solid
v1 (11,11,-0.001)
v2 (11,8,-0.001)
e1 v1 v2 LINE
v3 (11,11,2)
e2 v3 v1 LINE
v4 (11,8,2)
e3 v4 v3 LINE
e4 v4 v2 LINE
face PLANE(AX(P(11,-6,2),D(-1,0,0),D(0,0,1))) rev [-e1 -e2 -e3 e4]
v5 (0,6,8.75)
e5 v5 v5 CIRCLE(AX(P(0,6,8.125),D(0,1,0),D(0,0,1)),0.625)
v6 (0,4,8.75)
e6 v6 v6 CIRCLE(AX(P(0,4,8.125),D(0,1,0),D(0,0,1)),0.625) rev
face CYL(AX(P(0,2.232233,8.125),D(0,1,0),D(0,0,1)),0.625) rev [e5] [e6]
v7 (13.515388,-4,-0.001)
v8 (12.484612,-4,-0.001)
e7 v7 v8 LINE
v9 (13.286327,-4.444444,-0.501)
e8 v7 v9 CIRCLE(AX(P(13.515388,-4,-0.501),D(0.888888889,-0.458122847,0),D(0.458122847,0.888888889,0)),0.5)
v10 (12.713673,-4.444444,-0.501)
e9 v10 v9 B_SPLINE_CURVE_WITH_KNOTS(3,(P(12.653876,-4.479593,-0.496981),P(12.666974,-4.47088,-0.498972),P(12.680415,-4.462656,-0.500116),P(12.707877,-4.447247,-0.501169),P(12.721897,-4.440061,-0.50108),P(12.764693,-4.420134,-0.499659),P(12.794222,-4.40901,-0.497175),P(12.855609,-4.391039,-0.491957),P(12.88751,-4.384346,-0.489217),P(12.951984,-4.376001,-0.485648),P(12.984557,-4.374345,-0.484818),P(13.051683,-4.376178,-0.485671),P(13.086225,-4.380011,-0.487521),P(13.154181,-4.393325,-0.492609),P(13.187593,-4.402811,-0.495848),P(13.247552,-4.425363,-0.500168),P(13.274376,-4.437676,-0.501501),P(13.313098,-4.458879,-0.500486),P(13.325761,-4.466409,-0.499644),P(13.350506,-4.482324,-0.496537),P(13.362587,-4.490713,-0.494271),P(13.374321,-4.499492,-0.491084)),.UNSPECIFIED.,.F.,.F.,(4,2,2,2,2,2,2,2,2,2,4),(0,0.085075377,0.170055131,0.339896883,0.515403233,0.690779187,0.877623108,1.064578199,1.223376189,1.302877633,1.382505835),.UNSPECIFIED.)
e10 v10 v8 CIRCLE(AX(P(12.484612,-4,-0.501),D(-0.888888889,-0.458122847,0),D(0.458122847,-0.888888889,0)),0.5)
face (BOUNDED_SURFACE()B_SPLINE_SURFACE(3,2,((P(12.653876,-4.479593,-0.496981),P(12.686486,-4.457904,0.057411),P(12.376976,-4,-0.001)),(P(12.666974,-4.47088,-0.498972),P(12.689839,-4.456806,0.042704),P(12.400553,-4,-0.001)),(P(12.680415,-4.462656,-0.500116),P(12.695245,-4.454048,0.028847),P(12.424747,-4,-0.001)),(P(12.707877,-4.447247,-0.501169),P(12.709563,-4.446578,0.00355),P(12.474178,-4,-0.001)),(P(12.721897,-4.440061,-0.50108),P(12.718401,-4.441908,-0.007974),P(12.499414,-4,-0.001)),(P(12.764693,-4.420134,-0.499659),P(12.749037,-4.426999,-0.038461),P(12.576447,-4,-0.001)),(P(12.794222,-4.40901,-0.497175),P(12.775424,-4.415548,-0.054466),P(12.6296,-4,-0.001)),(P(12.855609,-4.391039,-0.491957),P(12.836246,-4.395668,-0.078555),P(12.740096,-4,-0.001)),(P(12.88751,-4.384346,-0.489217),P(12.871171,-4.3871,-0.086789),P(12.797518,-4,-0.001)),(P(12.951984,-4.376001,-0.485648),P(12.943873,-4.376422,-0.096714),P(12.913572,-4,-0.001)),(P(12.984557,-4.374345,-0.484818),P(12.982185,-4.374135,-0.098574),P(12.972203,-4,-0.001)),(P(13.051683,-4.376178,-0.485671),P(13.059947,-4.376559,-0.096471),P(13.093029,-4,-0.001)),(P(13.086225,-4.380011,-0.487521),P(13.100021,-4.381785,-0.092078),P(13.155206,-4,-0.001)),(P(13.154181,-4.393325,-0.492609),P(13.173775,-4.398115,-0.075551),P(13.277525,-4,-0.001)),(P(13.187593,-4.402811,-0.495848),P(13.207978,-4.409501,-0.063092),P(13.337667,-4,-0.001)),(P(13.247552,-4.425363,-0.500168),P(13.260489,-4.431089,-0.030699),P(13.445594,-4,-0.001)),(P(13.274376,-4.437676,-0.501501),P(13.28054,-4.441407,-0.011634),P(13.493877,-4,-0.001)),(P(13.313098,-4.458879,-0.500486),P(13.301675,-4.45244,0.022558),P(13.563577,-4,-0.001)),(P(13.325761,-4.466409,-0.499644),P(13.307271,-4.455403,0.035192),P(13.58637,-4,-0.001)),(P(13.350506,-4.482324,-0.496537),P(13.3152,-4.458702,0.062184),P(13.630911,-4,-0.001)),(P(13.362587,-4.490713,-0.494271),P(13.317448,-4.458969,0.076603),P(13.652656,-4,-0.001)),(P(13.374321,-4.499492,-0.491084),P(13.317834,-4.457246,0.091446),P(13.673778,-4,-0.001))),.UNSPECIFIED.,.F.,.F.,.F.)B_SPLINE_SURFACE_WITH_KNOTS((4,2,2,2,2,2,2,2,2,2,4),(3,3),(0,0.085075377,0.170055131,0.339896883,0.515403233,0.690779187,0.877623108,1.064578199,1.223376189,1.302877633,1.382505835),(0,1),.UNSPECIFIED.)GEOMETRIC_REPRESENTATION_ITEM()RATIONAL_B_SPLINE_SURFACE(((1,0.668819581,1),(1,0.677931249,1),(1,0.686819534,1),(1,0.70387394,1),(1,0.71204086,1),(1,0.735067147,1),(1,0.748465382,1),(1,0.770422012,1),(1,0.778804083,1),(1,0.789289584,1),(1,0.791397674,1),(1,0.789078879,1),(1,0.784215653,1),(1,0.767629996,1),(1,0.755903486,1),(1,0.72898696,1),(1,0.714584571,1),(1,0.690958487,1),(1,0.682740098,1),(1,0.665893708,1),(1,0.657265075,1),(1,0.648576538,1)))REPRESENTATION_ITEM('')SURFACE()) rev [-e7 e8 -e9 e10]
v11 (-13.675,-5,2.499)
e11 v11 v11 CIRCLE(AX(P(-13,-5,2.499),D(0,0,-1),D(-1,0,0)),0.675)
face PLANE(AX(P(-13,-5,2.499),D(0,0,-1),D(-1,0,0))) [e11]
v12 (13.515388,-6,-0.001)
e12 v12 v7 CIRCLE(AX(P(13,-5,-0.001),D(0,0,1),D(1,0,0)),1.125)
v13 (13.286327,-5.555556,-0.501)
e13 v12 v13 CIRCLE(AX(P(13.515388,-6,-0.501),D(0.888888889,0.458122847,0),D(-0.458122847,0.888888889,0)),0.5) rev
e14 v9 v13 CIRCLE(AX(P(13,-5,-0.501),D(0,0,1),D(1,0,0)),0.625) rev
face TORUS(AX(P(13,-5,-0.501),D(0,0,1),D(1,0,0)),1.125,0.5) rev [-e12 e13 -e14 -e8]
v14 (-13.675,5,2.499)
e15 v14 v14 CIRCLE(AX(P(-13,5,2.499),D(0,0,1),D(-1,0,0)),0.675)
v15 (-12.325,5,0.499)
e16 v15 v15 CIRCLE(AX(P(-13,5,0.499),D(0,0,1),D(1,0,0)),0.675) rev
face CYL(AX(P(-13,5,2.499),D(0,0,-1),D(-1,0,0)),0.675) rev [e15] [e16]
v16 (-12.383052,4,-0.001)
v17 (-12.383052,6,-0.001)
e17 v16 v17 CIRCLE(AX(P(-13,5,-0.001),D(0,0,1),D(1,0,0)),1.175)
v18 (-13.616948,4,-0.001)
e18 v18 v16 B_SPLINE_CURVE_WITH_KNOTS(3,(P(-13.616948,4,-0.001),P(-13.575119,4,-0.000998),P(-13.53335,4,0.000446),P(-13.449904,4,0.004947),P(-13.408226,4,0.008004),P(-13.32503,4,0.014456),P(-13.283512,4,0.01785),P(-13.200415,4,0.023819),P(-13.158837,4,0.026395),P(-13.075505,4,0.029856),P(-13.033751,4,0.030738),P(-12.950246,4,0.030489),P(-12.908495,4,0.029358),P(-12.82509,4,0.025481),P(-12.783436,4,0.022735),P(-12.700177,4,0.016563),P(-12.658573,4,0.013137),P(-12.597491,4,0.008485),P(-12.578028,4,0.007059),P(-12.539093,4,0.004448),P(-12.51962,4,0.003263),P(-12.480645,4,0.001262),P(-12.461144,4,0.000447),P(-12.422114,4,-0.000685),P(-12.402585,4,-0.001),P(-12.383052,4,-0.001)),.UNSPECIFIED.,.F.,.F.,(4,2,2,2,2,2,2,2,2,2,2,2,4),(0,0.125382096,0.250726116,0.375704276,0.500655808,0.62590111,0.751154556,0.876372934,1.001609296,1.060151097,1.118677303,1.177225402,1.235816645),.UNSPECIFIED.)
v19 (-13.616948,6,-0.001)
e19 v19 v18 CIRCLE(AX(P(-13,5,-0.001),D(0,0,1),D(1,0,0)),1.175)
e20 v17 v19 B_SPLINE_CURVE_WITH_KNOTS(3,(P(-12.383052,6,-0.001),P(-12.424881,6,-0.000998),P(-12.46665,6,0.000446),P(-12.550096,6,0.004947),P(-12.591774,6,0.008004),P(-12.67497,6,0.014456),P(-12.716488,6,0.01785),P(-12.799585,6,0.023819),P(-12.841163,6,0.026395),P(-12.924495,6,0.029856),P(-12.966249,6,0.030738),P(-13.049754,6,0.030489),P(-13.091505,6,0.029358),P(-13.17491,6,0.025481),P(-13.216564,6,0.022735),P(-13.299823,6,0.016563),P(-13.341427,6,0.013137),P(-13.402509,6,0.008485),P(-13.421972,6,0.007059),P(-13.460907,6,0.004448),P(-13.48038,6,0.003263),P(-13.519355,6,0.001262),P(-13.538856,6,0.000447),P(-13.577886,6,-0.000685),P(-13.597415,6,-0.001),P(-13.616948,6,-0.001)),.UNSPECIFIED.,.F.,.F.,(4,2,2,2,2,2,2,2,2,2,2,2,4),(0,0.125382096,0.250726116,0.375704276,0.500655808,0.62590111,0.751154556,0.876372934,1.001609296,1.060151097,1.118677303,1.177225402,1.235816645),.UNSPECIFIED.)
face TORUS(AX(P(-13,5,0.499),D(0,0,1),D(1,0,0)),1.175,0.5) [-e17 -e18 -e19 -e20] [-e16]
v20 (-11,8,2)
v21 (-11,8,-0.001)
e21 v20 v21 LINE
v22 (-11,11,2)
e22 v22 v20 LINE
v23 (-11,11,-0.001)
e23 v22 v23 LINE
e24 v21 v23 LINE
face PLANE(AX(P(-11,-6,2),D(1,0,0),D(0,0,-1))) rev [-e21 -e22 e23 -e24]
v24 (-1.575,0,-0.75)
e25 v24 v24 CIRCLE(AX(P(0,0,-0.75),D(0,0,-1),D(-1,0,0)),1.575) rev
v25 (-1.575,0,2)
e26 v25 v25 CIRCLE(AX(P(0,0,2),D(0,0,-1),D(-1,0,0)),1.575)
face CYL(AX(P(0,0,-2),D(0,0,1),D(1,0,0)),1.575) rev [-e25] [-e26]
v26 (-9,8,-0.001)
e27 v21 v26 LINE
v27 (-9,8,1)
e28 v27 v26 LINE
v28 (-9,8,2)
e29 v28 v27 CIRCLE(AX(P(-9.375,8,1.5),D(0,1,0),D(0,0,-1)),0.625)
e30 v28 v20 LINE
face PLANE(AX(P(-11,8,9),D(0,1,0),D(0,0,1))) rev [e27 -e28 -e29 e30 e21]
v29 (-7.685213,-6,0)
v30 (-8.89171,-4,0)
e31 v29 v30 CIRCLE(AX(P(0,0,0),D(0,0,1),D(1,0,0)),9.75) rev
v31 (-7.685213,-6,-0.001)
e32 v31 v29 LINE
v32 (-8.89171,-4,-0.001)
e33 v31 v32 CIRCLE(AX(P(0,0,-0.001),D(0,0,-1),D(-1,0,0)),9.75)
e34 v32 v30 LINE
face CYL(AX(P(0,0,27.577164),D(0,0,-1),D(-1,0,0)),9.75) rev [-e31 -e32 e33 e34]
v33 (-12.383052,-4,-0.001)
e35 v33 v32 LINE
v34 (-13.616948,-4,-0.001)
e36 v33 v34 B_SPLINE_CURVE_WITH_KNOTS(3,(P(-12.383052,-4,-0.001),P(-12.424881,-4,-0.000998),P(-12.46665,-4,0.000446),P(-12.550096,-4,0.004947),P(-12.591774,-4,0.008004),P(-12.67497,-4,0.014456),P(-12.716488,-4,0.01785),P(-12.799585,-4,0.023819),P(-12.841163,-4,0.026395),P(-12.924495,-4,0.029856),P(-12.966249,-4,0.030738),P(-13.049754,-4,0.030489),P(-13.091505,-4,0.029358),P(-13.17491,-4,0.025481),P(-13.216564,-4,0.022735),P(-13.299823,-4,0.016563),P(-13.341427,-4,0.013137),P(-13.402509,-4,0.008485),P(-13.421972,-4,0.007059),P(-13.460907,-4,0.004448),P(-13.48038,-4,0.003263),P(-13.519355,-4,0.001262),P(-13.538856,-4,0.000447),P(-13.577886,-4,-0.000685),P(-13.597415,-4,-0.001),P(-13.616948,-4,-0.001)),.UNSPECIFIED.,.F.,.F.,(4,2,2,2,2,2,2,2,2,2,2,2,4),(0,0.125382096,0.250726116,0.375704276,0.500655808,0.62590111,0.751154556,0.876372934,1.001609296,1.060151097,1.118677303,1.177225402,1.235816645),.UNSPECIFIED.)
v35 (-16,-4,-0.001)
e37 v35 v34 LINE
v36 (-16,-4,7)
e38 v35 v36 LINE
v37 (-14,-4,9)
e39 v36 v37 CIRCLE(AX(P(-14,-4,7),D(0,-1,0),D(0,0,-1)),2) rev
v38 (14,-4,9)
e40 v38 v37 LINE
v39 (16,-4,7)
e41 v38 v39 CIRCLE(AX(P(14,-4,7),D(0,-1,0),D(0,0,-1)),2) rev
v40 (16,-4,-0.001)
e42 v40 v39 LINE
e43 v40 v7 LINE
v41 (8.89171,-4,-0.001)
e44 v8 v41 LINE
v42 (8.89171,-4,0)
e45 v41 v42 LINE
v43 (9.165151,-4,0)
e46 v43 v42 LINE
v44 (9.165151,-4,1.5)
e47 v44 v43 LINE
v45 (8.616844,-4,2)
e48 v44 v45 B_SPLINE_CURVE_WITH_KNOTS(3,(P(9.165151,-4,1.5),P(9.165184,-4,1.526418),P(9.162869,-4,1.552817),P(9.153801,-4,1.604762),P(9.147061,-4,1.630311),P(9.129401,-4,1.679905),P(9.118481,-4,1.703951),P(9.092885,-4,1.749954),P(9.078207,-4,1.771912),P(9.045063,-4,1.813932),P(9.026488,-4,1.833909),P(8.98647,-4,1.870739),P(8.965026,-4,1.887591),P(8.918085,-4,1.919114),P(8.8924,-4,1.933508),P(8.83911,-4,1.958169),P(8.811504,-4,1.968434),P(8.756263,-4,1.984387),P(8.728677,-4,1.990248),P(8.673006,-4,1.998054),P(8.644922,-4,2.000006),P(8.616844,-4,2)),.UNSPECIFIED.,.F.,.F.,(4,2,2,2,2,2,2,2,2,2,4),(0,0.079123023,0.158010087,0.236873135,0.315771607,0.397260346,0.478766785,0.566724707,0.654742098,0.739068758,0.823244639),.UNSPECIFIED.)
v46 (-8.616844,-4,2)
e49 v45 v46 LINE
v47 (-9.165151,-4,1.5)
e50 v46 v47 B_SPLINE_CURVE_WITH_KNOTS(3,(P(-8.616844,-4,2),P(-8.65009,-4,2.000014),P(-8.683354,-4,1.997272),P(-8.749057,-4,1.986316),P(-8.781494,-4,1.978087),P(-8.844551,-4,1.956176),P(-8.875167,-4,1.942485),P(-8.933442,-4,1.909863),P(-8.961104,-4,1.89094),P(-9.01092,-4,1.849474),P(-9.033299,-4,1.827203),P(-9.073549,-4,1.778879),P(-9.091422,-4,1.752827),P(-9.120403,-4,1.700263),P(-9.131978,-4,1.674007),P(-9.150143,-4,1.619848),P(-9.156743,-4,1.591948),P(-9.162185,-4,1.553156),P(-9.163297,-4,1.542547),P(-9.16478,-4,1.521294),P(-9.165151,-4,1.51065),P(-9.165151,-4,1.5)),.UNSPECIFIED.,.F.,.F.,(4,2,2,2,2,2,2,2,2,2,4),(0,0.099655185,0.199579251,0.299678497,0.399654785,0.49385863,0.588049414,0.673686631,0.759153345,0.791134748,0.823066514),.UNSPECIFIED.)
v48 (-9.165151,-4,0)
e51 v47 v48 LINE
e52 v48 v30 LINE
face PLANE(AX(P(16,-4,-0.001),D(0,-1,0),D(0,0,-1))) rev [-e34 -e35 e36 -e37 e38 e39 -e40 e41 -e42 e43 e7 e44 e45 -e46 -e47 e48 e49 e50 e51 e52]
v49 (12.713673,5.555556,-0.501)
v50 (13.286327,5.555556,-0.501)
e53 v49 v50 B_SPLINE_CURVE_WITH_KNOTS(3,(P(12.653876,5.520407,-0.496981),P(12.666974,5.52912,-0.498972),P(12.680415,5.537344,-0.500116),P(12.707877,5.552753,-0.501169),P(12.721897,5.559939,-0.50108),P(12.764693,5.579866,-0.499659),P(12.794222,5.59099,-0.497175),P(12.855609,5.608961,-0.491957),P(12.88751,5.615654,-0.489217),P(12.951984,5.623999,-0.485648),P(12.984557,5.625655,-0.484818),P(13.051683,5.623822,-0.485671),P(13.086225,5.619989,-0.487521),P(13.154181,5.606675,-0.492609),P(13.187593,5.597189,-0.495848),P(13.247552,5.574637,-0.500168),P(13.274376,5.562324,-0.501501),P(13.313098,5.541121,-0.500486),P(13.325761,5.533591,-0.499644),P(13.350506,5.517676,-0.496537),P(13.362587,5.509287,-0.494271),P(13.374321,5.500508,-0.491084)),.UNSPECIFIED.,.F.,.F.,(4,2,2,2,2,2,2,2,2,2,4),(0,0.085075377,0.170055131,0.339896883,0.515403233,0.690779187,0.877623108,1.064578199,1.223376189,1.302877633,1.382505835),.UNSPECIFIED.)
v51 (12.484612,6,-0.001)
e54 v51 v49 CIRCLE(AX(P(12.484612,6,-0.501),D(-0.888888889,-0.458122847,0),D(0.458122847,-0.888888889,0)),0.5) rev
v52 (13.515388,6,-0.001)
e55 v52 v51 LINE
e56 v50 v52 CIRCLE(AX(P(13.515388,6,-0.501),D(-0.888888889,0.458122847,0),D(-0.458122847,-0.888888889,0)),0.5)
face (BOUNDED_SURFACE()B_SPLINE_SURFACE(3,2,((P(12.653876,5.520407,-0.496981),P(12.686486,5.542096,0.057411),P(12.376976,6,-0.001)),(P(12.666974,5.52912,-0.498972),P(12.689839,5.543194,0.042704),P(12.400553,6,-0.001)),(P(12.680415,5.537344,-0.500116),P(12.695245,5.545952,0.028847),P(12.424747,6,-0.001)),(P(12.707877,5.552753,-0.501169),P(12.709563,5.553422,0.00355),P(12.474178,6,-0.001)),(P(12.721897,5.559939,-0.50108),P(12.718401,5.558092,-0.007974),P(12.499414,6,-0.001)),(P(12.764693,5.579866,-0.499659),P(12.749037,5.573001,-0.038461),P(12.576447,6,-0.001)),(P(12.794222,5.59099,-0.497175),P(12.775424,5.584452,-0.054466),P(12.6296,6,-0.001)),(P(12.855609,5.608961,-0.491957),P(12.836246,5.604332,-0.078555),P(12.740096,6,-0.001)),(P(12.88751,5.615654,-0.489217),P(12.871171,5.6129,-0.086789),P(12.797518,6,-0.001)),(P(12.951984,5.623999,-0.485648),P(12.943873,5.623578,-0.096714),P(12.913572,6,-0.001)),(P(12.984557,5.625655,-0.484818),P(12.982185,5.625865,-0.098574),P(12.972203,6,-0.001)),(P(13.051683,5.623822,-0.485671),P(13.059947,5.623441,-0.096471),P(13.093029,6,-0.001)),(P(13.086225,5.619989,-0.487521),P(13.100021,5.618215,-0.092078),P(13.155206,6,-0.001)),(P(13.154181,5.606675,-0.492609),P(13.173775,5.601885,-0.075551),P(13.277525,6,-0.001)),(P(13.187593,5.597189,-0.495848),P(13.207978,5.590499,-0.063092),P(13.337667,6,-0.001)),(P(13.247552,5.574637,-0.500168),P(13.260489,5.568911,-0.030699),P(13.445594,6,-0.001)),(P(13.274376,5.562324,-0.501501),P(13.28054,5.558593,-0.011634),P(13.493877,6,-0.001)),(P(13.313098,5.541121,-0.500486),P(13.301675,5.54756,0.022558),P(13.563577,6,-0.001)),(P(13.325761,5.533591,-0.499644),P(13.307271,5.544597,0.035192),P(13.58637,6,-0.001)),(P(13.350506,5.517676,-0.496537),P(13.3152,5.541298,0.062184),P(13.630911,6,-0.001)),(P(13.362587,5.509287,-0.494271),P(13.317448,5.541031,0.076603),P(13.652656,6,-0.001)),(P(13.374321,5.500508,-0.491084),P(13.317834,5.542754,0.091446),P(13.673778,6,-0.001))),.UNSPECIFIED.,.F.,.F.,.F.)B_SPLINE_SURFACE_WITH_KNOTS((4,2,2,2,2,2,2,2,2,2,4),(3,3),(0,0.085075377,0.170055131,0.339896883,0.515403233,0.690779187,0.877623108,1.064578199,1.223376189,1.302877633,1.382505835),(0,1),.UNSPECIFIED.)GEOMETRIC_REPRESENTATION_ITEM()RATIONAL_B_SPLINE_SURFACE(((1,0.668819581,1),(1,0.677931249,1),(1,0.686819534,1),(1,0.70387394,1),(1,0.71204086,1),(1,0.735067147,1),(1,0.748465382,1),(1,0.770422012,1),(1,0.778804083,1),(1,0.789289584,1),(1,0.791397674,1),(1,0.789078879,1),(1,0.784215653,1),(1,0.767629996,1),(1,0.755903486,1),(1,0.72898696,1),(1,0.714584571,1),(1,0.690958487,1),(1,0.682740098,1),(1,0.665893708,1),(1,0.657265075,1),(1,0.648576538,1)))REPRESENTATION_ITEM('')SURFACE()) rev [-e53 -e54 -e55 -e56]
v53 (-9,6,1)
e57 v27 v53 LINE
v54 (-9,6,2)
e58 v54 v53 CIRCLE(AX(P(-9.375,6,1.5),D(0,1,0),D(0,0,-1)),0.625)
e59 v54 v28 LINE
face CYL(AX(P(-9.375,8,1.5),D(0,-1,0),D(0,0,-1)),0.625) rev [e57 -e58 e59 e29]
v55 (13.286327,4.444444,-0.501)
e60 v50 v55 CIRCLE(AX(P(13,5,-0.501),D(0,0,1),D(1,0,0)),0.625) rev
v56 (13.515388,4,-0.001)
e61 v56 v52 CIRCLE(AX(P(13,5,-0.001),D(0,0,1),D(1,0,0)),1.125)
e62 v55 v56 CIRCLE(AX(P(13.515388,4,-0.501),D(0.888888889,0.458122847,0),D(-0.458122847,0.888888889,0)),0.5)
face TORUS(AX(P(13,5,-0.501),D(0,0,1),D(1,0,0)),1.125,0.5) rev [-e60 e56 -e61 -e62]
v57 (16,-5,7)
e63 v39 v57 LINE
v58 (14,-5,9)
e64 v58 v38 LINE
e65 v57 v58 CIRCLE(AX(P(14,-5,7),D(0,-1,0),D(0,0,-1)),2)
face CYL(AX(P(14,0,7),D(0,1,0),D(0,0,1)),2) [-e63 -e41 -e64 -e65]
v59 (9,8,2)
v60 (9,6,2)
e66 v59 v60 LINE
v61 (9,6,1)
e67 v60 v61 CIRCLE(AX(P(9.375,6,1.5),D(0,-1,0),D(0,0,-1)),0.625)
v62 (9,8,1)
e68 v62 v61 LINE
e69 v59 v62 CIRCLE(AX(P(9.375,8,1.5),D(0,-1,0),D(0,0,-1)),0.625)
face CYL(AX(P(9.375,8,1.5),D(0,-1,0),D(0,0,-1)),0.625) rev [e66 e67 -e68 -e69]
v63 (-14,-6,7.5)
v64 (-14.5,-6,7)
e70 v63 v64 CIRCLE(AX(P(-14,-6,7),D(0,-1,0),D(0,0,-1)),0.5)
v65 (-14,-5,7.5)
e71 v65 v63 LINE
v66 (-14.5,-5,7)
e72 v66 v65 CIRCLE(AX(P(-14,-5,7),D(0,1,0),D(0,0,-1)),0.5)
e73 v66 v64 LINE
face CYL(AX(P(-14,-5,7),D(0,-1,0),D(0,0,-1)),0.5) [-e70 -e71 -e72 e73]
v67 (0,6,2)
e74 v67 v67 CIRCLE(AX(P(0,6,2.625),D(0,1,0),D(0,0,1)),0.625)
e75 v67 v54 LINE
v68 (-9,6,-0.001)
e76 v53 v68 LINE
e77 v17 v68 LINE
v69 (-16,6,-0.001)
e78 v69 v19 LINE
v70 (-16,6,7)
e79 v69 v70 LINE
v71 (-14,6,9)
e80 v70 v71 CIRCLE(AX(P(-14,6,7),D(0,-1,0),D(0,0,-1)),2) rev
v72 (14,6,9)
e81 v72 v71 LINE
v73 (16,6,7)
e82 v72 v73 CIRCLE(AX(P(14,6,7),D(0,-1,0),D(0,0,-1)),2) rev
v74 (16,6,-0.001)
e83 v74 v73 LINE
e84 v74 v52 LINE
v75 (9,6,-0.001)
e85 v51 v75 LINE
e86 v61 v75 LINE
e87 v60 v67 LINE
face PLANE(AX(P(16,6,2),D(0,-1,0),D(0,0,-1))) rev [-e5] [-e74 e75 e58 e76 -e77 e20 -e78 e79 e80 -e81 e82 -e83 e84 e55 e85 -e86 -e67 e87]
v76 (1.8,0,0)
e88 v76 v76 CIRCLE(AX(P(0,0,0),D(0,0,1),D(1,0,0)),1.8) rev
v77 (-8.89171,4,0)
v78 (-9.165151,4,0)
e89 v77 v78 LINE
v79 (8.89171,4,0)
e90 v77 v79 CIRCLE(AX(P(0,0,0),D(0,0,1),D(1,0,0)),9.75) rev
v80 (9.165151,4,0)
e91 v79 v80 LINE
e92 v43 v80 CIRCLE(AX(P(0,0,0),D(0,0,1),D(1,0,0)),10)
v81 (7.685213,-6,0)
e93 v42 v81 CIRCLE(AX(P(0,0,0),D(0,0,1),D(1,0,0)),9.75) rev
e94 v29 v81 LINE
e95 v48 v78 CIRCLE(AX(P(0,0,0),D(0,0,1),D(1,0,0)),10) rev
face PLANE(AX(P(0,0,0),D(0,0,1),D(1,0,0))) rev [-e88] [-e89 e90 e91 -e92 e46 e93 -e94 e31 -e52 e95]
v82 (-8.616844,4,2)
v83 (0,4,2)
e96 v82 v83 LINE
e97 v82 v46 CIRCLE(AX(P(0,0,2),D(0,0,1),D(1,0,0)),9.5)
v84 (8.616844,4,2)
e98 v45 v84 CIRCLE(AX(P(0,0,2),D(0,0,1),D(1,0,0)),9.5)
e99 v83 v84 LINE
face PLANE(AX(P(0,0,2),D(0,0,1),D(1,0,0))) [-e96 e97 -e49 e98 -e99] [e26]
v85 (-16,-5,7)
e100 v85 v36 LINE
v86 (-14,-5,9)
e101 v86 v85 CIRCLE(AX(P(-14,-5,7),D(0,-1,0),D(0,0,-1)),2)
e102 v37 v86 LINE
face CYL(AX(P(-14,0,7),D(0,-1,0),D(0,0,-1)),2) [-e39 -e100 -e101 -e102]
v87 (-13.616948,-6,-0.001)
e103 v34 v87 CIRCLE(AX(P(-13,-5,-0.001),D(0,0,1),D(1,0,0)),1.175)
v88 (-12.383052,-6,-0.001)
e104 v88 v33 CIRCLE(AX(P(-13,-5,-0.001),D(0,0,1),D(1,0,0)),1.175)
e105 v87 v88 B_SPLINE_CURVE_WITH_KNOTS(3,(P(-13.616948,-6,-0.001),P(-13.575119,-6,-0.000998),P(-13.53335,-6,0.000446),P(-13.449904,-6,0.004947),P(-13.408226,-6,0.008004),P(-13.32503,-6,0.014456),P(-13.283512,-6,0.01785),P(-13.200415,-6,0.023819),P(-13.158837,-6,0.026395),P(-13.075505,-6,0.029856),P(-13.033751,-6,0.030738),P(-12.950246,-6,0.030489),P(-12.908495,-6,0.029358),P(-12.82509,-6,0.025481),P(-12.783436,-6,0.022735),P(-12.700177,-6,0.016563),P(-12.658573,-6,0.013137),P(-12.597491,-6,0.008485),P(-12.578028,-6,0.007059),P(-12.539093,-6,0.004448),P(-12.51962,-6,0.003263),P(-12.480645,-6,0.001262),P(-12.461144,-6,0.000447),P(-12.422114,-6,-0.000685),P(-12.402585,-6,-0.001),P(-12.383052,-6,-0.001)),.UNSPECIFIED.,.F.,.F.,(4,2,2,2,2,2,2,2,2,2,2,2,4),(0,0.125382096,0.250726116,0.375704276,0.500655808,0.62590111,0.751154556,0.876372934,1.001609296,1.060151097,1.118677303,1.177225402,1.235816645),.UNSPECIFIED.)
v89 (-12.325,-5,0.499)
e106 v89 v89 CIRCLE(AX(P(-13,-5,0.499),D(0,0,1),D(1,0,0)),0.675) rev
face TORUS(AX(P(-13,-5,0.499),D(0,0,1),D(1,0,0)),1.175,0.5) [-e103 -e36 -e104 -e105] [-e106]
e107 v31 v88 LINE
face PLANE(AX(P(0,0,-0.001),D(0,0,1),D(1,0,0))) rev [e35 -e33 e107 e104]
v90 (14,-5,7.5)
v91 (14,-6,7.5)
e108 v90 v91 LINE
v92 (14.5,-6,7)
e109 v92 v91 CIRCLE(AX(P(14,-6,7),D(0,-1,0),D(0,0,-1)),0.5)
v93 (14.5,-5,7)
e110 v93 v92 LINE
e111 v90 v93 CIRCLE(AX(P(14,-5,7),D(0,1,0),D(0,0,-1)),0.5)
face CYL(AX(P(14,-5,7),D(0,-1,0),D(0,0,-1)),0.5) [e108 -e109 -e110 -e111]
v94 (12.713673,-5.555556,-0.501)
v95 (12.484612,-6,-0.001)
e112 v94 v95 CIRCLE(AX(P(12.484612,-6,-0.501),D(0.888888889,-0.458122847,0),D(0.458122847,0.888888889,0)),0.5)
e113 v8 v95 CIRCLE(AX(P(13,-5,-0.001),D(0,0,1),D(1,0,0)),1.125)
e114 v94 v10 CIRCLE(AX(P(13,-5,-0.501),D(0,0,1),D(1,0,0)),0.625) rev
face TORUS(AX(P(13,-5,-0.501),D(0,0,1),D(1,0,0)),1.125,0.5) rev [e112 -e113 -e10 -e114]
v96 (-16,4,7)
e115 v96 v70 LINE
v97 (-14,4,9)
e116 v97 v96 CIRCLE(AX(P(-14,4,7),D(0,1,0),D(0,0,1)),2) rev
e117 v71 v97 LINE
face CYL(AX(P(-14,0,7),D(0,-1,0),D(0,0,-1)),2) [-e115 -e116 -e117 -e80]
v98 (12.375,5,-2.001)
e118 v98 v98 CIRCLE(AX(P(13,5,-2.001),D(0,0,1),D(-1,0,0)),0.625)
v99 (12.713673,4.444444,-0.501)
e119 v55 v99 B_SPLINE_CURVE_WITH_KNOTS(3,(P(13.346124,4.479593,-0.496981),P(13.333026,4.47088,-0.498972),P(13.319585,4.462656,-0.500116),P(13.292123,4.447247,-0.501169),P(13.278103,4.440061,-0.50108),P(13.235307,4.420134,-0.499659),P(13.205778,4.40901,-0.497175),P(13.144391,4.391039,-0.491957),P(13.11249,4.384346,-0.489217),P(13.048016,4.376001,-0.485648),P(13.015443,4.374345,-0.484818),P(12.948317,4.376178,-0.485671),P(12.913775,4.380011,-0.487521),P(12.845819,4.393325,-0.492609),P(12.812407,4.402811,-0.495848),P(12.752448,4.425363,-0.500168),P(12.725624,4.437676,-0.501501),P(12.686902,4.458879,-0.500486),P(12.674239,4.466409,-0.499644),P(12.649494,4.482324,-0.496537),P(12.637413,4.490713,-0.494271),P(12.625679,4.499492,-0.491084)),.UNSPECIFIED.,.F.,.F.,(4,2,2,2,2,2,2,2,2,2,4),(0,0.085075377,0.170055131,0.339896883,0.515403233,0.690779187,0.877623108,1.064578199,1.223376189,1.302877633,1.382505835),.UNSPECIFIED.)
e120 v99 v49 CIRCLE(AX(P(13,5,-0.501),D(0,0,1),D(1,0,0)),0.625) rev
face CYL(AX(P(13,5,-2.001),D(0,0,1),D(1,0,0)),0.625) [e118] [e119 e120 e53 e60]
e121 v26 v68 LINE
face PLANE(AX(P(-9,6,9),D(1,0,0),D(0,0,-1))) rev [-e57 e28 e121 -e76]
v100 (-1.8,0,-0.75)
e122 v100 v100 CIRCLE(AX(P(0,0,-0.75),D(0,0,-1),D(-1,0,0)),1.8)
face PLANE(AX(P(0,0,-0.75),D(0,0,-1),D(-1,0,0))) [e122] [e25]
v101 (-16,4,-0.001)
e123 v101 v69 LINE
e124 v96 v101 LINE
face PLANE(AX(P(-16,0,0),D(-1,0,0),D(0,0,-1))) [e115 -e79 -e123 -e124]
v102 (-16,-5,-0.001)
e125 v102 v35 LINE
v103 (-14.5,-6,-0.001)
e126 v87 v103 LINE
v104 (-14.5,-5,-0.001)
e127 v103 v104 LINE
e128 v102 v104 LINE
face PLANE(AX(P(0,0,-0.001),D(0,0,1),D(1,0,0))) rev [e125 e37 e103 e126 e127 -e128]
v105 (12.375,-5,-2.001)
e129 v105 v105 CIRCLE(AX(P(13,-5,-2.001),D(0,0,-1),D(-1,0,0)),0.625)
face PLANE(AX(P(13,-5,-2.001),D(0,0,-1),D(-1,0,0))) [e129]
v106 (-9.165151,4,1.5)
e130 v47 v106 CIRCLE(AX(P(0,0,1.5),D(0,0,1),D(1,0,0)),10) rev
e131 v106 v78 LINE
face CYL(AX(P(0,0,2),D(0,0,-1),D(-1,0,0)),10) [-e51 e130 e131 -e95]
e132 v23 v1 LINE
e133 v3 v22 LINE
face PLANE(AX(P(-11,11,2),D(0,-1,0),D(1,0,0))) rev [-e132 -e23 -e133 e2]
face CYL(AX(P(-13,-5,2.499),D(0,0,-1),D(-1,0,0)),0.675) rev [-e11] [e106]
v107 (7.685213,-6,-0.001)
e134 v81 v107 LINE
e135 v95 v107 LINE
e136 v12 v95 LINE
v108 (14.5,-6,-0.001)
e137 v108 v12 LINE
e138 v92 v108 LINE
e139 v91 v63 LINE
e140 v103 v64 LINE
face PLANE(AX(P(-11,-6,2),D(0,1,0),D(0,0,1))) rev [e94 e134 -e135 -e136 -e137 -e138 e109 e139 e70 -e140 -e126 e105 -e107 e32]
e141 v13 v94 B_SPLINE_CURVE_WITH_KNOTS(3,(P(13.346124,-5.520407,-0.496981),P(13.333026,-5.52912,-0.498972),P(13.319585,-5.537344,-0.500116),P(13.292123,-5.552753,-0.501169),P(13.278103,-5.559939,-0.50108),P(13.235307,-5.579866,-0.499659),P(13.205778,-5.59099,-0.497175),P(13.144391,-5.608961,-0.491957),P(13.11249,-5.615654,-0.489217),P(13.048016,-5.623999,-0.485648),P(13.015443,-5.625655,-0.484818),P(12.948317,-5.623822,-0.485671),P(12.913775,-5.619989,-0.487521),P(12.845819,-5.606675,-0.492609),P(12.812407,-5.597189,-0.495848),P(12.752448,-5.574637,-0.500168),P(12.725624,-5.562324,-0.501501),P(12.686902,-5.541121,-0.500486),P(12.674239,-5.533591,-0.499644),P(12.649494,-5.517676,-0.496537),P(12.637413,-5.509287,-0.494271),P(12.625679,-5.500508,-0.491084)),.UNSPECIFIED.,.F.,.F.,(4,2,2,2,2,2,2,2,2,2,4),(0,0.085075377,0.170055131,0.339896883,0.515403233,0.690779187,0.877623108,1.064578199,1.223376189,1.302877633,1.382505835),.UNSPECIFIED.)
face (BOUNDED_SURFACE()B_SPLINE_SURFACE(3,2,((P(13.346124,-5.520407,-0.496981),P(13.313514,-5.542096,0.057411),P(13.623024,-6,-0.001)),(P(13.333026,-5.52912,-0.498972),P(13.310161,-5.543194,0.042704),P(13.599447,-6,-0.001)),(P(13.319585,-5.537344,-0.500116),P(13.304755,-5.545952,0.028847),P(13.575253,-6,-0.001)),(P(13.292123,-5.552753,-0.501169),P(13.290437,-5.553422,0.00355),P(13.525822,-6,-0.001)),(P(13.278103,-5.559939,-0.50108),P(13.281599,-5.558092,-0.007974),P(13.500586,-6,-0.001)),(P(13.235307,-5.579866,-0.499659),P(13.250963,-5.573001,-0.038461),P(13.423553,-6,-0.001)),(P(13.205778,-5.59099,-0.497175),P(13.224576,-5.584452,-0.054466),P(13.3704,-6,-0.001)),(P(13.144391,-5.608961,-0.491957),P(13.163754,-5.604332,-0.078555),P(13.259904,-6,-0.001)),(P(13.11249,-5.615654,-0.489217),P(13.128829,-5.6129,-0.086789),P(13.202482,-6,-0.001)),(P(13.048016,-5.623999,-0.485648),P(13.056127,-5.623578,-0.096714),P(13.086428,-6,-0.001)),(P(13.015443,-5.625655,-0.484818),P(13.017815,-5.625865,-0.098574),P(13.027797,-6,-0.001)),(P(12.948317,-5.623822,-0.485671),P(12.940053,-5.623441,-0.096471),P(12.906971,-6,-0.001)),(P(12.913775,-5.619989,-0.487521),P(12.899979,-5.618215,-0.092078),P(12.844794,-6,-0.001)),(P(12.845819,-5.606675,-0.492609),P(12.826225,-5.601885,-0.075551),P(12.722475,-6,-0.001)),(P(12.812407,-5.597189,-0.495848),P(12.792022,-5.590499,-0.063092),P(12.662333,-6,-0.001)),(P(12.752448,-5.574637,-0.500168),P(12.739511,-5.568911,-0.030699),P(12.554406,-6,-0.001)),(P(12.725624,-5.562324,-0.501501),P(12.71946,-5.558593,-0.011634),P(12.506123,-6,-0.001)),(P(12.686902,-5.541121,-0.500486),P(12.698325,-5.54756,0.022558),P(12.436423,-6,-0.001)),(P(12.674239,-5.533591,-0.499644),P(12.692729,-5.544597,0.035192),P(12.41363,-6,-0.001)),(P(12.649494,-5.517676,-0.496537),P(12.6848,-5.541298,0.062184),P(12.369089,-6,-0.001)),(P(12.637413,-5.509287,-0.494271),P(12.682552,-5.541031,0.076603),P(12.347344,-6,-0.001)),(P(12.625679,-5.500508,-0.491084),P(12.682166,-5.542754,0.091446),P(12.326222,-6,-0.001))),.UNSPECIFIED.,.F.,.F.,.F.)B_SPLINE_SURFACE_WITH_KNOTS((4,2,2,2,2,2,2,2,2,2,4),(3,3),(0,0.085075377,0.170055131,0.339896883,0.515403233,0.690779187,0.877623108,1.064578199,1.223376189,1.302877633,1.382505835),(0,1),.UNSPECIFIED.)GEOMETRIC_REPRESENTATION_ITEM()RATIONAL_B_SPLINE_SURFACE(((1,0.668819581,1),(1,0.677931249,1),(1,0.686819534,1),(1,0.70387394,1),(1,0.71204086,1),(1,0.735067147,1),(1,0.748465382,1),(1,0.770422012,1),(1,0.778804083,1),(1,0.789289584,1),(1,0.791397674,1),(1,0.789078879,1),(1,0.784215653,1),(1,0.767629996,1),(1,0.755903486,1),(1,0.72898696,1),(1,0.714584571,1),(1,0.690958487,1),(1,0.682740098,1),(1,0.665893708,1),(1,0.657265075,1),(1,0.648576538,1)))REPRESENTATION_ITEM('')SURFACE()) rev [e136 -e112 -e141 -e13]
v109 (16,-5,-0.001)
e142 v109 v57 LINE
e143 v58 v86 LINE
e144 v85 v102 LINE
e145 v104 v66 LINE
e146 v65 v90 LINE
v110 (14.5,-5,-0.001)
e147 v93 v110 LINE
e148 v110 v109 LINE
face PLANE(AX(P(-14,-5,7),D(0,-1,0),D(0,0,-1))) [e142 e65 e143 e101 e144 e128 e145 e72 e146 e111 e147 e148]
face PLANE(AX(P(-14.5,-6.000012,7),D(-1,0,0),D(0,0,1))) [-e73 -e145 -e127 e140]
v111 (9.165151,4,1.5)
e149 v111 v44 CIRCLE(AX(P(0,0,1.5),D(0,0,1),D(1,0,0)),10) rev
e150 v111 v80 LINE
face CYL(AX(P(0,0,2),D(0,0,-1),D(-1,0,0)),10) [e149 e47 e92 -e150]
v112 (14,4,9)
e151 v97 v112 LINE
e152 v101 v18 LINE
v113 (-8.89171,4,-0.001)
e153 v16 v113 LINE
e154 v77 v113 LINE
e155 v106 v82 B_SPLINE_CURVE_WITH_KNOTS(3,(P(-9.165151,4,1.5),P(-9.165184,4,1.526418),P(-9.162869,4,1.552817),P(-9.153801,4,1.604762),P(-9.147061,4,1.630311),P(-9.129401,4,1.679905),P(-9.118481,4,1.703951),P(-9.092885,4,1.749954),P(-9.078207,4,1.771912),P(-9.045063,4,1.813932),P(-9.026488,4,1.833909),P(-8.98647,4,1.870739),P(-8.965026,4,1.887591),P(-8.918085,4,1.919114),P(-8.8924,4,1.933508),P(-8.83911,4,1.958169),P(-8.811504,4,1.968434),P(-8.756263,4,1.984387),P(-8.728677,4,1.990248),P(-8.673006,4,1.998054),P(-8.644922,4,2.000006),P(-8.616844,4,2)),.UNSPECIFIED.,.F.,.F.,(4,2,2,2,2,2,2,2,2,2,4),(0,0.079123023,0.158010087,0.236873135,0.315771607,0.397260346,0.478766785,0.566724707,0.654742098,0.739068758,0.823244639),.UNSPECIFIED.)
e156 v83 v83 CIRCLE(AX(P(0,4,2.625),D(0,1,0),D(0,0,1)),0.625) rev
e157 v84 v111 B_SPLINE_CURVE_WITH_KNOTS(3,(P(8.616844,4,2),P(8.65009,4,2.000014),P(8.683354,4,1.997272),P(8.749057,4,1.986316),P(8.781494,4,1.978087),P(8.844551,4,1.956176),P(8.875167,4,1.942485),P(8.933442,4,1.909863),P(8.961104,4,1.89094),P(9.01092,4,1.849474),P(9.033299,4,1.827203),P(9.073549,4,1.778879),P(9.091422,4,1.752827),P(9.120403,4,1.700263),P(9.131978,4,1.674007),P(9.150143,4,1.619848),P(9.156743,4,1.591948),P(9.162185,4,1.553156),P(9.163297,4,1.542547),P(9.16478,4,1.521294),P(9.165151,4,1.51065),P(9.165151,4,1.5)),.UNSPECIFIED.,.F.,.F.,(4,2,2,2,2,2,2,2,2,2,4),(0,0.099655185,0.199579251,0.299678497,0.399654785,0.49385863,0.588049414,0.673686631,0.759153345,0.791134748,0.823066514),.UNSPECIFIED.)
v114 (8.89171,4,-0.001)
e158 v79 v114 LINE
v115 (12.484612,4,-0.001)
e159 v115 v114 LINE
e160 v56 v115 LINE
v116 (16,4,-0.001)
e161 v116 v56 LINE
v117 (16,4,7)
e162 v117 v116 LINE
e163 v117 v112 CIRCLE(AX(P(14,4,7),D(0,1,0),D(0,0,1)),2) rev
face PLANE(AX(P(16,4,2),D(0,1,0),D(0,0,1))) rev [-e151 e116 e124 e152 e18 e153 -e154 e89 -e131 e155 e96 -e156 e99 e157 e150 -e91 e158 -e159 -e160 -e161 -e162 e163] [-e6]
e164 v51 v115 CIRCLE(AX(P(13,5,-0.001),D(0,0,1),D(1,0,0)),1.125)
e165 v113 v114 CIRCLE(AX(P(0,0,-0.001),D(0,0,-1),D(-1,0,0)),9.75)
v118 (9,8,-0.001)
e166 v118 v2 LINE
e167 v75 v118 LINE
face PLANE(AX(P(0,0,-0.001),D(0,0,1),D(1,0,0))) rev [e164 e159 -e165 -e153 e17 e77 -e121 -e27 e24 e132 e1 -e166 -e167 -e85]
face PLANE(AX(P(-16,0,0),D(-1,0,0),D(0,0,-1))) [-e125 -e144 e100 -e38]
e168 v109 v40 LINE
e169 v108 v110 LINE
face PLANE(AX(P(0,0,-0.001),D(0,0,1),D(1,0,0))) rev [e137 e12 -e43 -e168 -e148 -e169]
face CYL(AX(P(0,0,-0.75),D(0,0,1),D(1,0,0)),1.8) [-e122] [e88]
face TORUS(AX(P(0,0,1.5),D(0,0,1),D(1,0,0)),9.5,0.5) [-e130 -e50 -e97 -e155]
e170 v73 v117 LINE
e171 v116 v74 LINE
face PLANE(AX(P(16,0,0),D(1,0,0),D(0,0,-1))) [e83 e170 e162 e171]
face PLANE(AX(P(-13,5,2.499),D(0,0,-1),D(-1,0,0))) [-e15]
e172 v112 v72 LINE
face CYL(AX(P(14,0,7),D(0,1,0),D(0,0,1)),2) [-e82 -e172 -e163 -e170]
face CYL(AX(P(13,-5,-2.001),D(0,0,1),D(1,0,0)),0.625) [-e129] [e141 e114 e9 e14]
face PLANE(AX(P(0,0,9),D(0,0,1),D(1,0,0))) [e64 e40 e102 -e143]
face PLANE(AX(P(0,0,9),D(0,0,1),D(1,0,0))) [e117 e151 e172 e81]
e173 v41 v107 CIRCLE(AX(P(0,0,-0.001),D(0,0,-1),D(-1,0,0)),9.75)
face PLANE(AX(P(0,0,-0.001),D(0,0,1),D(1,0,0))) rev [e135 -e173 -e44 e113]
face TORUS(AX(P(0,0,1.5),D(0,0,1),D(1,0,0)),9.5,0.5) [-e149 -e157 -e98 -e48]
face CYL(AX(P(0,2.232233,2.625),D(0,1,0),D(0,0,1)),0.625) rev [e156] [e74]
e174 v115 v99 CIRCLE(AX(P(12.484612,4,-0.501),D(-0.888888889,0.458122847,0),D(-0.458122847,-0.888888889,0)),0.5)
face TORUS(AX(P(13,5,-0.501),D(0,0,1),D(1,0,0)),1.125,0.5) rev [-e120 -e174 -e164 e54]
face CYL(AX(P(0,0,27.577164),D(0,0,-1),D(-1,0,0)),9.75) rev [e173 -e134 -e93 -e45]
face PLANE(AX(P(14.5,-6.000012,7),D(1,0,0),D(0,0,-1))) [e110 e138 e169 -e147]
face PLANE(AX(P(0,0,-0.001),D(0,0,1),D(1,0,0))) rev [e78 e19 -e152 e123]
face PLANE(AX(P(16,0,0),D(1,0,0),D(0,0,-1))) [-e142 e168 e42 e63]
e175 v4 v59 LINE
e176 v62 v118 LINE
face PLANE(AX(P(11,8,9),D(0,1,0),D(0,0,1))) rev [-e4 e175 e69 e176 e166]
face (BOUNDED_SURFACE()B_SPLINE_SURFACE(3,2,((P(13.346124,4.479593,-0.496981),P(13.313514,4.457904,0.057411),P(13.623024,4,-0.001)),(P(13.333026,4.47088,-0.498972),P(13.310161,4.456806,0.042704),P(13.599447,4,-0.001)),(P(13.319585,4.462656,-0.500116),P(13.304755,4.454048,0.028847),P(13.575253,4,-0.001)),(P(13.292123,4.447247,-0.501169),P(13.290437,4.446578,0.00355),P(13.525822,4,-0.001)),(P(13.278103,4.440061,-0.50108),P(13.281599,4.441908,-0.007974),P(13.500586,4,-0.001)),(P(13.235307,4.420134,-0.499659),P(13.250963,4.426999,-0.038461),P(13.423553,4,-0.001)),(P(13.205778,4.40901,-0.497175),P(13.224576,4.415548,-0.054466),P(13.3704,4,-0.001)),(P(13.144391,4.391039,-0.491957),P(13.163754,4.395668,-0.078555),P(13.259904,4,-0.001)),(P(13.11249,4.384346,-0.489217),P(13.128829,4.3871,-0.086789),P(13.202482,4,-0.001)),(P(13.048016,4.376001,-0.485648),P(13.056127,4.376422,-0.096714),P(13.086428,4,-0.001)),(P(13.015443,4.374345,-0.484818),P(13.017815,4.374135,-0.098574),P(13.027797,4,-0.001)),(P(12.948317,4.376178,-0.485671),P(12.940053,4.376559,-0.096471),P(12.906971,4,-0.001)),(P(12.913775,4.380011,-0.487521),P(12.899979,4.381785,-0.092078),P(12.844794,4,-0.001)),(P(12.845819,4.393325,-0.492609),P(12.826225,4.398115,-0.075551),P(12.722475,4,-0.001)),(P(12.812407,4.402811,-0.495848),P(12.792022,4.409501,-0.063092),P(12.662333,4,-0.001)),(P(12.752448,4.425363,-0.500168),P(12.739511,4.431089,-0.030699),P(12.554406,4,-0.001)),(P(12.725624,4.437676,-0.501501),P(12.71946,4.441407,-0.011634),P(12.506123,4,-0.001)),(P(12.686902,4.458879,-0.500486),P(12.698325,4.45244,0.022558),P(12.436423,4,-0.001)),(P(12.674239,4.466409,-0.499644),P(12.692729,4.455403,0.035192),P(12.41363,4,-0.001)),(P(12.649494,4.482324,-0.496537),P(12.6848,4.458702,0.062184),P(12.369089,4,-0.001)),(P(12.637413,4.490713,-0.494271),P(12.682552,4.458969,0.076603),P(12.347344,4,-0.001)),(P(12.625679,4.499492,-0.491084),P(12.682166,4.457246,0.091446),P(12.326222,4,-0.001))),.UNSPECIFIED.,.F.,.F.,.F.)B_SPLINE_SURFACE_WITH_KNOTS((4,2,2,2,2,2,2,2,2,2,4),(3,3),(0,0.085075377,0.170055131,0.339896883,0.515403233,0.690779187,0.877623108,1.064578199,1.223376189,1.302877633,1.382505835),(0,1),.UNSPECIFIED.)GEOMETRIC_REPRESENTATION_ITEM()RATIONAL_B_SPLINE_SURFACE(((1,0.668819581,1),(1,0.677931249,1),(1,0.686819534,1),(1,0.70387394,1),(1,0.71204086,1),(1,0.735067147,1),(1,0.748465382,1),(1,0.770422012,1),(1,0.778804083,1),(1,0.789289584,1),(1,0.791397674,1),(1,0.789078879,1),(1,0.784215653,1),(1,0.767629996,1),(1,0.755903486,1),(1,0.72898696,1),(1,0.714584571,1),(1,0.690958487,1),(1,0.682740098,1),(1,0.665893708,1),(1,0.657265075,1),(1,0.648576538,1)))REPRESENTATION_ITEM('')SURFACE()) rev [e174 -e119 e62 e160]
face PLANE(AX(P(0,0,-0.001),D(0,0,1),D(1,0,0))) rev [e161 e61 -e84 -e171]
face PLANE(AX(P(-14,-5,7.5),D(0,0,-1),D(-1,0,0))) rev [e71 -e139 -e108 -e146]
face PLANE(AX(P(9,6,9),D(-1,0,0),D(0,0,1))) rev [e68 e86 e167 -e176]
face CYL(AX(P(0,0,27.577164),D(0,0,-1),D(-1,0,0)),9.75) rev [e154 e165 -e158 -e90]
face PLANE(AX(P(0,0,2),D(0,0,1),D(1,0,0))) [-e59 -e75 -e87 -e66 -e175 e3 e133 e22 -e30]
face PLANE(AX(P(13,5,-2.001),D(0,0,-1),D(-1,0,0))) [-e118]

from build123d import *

# Parameters (mm, degrees)
BOSS_EXTRUDE1_DEPTH     = 2
SKETCH2_R               = 1.575
BOSS_EXTRUDE2_DEPTH     = 4
SKETCH3_R               = 1.8
BOSS_EXTRUDE3_DEPTH     = 0.75
SKETCH4_W               = 2
SKETCH4_H               = 17
BOSS_EXTRUDE4_DEPTH     = 0.001
SKETCH5_W               = 18
SKETCH5_H               = 2
BOSS_EXTRUDE5_DEPTH     = 0.001
SKETCH6_W               = 2.001
SKETCH6_H               = 2
BOSS_EXTRUDE6_DEPTH     = 5
BOSS_EXTRUDE7_DEPTH     = 0.001
CUT_EXTRUDE1_DEPTH      = 20.519323784
SKETCH9_W               = 2.937742252
SKETCH9_H               = 8
CUT_EXTRUDE2_DEPTH      = 0.001
CUT_EXTRUDE11_START     = -0.001
SKETCH21_R              = 9.75
SKETCH21_R_2            = 1.8
CUT_EXTRUDE11_DEPTH     = 0.001
SKETCH10_W              = 32
SKETCH10_H              = 2
BOSS_EXTRUDE8_DEPTH     = 7
FILLET1_R               = 0.5
SKETCH11_R              = 0.625
BOSS_EXTRUDE9_DEPTH     = 2
SKETCH14_W              = 2
SKETCH14_H              = 2
CUT_EXTRUDE5_DEPTH      = 22.401355237
SKETCH12_R              = 0.675
CUT_EXTRUDE3_DEPTH      = 2.5
CUT_EXTRUDE6_DEPTH      = 2
FILLET2_R               = 0.5
FILLET3_R               = 0.5
FILLET4_R               = 2
CUT_EXTRUDE7_DEPTH      = 26.019992106
CUT_EXTRUDE7_DEPTH_BACK = 1
SKETCH19_R              = 0.625
CUT_EXTRUDE9_DEPTH      = 2


with BuildPart() as part:
    # Sketch1 → Boss-Extrude1 (new body)
    with BuildSketch(Plane.XY):
        Polygon((-11, 6), (-11, 11), (11, 11), (11, 6), (11, -6), (-11, -6), align=None)
    extrude(amount=BOSS_EXTRUDE1_DEPTH)

    # Sketch3 → Boss-Extrude3 (add)
    with BuildSketch(Plane(origin=(0, 0, 0), x_dir=(-1, 0, 0), z_dir=(0, 0, -1))):
        with Locations(Location((0, 0, 0), (0, 0, 180))):
            Circle(SKETCH3_R)
    extrude(amount=BOSS_EXTRUDE3_DEPTH)

    # Sketch4 → Boss-Extrude4 (add)
    with BuildSketch(Plane(origin=(0, 0, 0), x_dir=(-1, 0, 0), z_dir=(0, 0, -1))):
        with Locations((10, 2.5)):
            Rectangle(SKETCH4_W, SKETCH4_H)
        with Locations((-10, 2.5)):
            Rectangle(SKETCH4_W, SKETCH4_H)
    extrude(amount=BOSS_EXTRUDE4_DEPTH)

    # Sketch5 → Boss-Extrude5 (add)
    with BuildSketch(Plane(origin=(0, 0, 0), x_dir=(-1, 0, 0), z_dir=(0, 0, -1))):
        with Locations((0, 10)):
            Rectangle(SKETCH5_W, SKETCH5_H)
    extrude(amount=BOSS_EXTRUDE5_DEPTH)

    # Sketch6 → Boss-Extrude6 (add)
    with BuildSketch(Plane(origin=(11, 0, 0), x_dir=(0, 0, -1), z_dir=(1, 0, 0))):
        with Locations((-0.9995, -5)):
            Rectangle(SKETCH6_W, SKETCH6_H)
        with Locations((-0.9995, 5)):
            Rectangle(SKETCH6_W, SKETCH6_H)
    boss_extrude6 = extrude(amount=BOSS_EXTRUDE6_DEPTH)

    # Mirror1: Boss-Extrude6 across plane
    add(boss_extrude6.mirror(Plane(origin=(0, 0, 0), x_dir=(0, 0, 1), z_dir=(1, 0, 0))))

    # Sketch7 → Boss-Extrude7 (add)
    with BuildSketch(Plane(origin=(0, 0, -0.001), x_dir=(-1, 0, 0), z_dir=(0, 0, -1))):
        with BuildLine():
            ThreePointArc((-6.708203932, -6), (-8.407551231, -3.211398808), (-9, 0))
            Line((-9, 0), (-9, -6))
            Line((-9, -6), (-6.708203932, -6))
        make_face()
        with BuildLine():
            Line((-9, 9), (-9, 0))
            ThreePointArc((-9, 0), (-6.363961031, 6.363961031), (0, 9))
            Line((0, 9), (-9, 9))
        make_face()
    boss_extrude7 = extrude(amount=-BOSS_EXTRUDE7_DEPTH)

    # Sketch8 → Cut-Extrude1 (cut, through all)
    with BuildSketch(Plane(origin=(0, 0, -0.001), x_dir=(-1, 0, 0), z_dir=(0, 0, -1))):
        with BuildLine():
            Line((-11, 4), (-9.16515139, 4))
            ThreePointArc((-9.16515139, 4), (-10, 0), (-9.16515139, -4))
            Line((-9.16515139, -4), (-11, -4))
            Line((-11, -4), (-11, 4))
        make_face()
    cut_extrude1 = extrude(amount=-CUT_EXTRUDE1_DEPTH, mode=Mode.SUBTRACT)

    # Sketch9 → Cut-Extrude2 (cut)
    with BuildSketch(Plane(origin=(0, 0, -0.001), x_dir=(-1, 0, 0), z_dir=(0, 0, -1))):
        with Locations((-9.531128874, 0)):
            Rectangle(SKETCH9_W, SKETCH9_H)
    cut_extrude2 = extrude(amount=-CUT_EXTRUDE2_DEPTH, mode=Mode.SUBTRACT)

    # Mirror2: Boss-Extrude7, Cut-Extrude1, Cut-Extrude2 across plane
    add(boss_extrude7.mirror(Plane(origin=(0, 0, 0), x_dir=(0, 0, 1), z_dir=(1, 0, 0))))
    add(cut_extrude1.mirror(Plane(origin=(0, 0, 0), x_dir=(0, 0, 1), z_dir=(1, 0, 0))), mode=Mode.SUBTRACT)
    add(cut_extrude2.mirror(Plane(origin=(0, 0, 0), x_dir=(0, 0, 1), z_dir=(1, 0, 0))), mode=Mode.SUBTRACT)

    # Sketch21 → Cut-Extrude11 (cut)
    with BuildSketch(Plane(origin=(0, 0, -0.001), x_dir=(-1, 0, 0), z_dir=(0, 0, -1)).offset(CUT_EXTRUDE11_START)):
        Circle(SKETCH21_R)
        with Locations(Location((0, 0, 0), (0, 0, 180))):
            Circle(SKETCH21_R_2, mode=Mode.SUBTRACT)
    extrude(amount=CUT_EXTRUDE11_DEPTH, mode=Mode.SUBTRACT)

    # Sketch10 → Boss-Extrude8 (add)
    with BuildSketch(Plane.XY.offset(2)):
        with Locations((0, -5)):
            Rectangle(SKETCH10_W, SKETCH10_H)
        with Locations((0, 5)):
            Rectangle(SKETCH10_W, SKETCH10_H)
    extrude(amount=BOSS_EXTRUDE8_DEPTH)

    # Fillet1
    fillet1_edges = [part.edges().sort_by_distance(p)[0] for p in [
        (10, 0, 2),
        (-10, 0, 2),
    ]]
    fillet(fillet1_edges, radius=FILLET1_R)

    # Sketch11 → Boss-Extrude9 (add)
    with BuildSketch(Plane(origin=(0, 0, -0.001), x_dir=(-1, 0, 0), z_dir=(0, 0, -1))):
        with Locations(Location((-13, -5, 0), (0, 0, 180))):
            Circle(SKETCH11_R)
    boss_extrude9 = extrude(amount=BOSS_EXTRUDE9_DEPTH)

    # Sketch14 → Cut-Extrude5 (cut, through all)
    with BuildSketch(Plane(origin=(0, 0, -0.001), x_dir=(-1, 0, 0), z_dir=(0, 0, -1))):
        with Locations((10, 7)):
            Rectangle(SKETCH14_W, SKETCH14_H)
        with Locations((-10, 7)):
            Rectangle(SKETCH14_W, SKETCH14_H)
    extrude(amount=-CUT_EXTRUDE5_DEPTH, mode=Mode.SUBTRACT)

    # Sketch12 → Cut-Extrude3 (cut)
    with BuildSketch(Plane(origin=(0, 0, -0.001), x_dir=(-1, 0, 0), z_dir=(0, 0, -1))):
        with Locations((13, -5)):
            Circle(SKETCH12_R)
    cut_extrude3 = extrude(amount=-CUT_EXTRUDE3_DEPTH, mode=Mode.SUBTRACT)

    # Sketch16 → Cut-Extrude6 (cut)
    with BuildSketch(Plane(origin=(0, 6, 0), x_dir=(1, 0, 0), z_dir=(0, 1, 0))):
        with BuildLine():
            Line((-9, -1), (-9, -2))
            ThreePointArc((-9, -2), (-8.75, -1.5), (-9, -1))
        make_face()
    cut_extrude6 = extrude(amount=CUT_EXTRUDE6_DEPTH, mode=Mode.SUBTRACT)

    # Mirror3: Boss-Extrude9, Cut-Extrude3 across plane
    add(boss_extrude9.mirror(Plane.ZX))
    add(cut_extrude3.mirror(Plane.ZX), mode=Mode.SUBTRACT)

    # Mirror4: Cut-Extrude6 across plane
    add(cut_extrude6.mirror(Plane(origin=(0, 0, 0), x_dir=(0, 0, 1), z_dir=(1, 0, 0))), mode=Mode.SUBTRACT)

    # Fillet2
    fillet2_edges = [part.edges().sort_by_distance(p)[0] for p in [
        (12.375, -5, -0.001),
        (12.375, 5, -0.001),
    ]]
    fillet(fillet2_edges, radius=FILLET2_R)

    # Fillet3
    # the kernel refuses this fillet: 0.5 mm, written as the material it takes off along each edge
    with BuildSketch(Plane(origin=(-13, -5, -0.001), x_dir=(-1, 0, 0), z_dir=(0, -1, 0))) as fillet3_piece_1:
        with BuildLine():
            CenterArc((0.675 + FILLET3_R, -FILLET3_R), FILLET3_R, 90, 90)
            Line((0.675, -FILLET3_R), (0.675, 0))
            Line((0.675, 0), (0.675 + FILLET3_R, 0))
        make_face()
    revolve(axis=Axis((-13, -5, -0.001), (0, 0, -1)), mode=Mode.SUBTRACT)
    with BuildSketch(Plane(origin=(-13, 5, -0.001), x_dir=(-1, 0, 0), z_dir=(0, 1, 0))) as fillet3_piece_2:
        with BuildLine():
            CenterArc((0.675 + FILLET3_R, FILLET3_R), FILLET3_R, 180, 90)
            Line((0.675, FILLET3_R), (0.675, 0))
            Line((0.675, 0), (0.675 + FILLET3_R, 0))
        make_face()
    revolve(axis=Axis((-13, 5, -0.001), (0, 0, 1)), mode=Mode.SUBTRACT)

    # Fillet4
    fillet4_edges = [part.edges().sort_by_distance(p)[0] for p in [
        (16, -5, 9),
        (-16, -5, 9),
        (-16, 5, 9),
        (16, 5, 9),
    ]]
    fillet(fillet4_edges, radius=FILLET4_R)

    # Sketch17 → Cut-Extrude7 (cut, two sides: drawn at the far end of the back side and taken through both)
    with BuildSketch(Plane.XZ.offset(6).offset(-CUT_EXTRUDE7_DEPTH_BACK)):
        with BuildLine():
            Line((-16, 7), (-16, -0.001))
            Line((-16, -0.001), (-14.5, -0.001))
            Line((-14.5, -0.001), (-14.5, 7))
            ThreePointArc((-14.5, 7), (-14.353553391, 7.353553391), (-14, 7.5))
            Line((-14, 7.5), (14, 7.5))
            ThreePointArc((14, 7.5), (14.353553391, 7.353553391), (14.5, 7))
            Line((14.5, 7), (14.5, -0.001))
            Line((14.5, -0.001), (16, -0.001))
            Line((16, -0.001), (16, 7))
            ThreePointArc((16, 7), (15.414213562, 8.414213562), (14, 9))
            Line((14, 9), (-14, 9))
            ThreePointArc((-14, 9), (-15.414213562, 8.414213562), (-16, 7))
        make_face()
    extrude(amount=CUT_EXTRUDE7_DEPTH + CUT_EXTRUDE7_DEPTH_BACK, mode=Mode.SUBTRACT)

    # Sketch19 → Cut-Extrude9 (cut)
    with BuildSketch(Plane(origin=(0, 6, 0), x_dir=(1, 0, 0), z_dir=(0, 1, 0))):
        with Locations(Location((0, -2.625, 0), (0, 0, 90))):
            Circle(SKETCH19_R)
        with Locations(Location((0, -8.125, 0), (0, 0, 270))):
            Circle(SKETCH19_R)
    extrude(amount=-CUT_EXTRUDE9_DEPTH, mode=Mode.SUBTRACT)


with BuildPart() as body_2:
    # Sketch2 → Boss-Extrude2 (new body)
    with BuildSketch(Plane(origin=(0, 0, 2), x_dir=(-1, 0, 0), z_dir=(0, 0, -1))):
        Circle(SKETCH2_R)
    extrude(amount=BOSS_EXTRUDE2_DEPTH)


with BuildPart() as part_1:
    add(part.part)

    # Combine2: cut body 2
    add(body_2.part, mode=Mode.SUBTRACT)


solid = part_1.part
